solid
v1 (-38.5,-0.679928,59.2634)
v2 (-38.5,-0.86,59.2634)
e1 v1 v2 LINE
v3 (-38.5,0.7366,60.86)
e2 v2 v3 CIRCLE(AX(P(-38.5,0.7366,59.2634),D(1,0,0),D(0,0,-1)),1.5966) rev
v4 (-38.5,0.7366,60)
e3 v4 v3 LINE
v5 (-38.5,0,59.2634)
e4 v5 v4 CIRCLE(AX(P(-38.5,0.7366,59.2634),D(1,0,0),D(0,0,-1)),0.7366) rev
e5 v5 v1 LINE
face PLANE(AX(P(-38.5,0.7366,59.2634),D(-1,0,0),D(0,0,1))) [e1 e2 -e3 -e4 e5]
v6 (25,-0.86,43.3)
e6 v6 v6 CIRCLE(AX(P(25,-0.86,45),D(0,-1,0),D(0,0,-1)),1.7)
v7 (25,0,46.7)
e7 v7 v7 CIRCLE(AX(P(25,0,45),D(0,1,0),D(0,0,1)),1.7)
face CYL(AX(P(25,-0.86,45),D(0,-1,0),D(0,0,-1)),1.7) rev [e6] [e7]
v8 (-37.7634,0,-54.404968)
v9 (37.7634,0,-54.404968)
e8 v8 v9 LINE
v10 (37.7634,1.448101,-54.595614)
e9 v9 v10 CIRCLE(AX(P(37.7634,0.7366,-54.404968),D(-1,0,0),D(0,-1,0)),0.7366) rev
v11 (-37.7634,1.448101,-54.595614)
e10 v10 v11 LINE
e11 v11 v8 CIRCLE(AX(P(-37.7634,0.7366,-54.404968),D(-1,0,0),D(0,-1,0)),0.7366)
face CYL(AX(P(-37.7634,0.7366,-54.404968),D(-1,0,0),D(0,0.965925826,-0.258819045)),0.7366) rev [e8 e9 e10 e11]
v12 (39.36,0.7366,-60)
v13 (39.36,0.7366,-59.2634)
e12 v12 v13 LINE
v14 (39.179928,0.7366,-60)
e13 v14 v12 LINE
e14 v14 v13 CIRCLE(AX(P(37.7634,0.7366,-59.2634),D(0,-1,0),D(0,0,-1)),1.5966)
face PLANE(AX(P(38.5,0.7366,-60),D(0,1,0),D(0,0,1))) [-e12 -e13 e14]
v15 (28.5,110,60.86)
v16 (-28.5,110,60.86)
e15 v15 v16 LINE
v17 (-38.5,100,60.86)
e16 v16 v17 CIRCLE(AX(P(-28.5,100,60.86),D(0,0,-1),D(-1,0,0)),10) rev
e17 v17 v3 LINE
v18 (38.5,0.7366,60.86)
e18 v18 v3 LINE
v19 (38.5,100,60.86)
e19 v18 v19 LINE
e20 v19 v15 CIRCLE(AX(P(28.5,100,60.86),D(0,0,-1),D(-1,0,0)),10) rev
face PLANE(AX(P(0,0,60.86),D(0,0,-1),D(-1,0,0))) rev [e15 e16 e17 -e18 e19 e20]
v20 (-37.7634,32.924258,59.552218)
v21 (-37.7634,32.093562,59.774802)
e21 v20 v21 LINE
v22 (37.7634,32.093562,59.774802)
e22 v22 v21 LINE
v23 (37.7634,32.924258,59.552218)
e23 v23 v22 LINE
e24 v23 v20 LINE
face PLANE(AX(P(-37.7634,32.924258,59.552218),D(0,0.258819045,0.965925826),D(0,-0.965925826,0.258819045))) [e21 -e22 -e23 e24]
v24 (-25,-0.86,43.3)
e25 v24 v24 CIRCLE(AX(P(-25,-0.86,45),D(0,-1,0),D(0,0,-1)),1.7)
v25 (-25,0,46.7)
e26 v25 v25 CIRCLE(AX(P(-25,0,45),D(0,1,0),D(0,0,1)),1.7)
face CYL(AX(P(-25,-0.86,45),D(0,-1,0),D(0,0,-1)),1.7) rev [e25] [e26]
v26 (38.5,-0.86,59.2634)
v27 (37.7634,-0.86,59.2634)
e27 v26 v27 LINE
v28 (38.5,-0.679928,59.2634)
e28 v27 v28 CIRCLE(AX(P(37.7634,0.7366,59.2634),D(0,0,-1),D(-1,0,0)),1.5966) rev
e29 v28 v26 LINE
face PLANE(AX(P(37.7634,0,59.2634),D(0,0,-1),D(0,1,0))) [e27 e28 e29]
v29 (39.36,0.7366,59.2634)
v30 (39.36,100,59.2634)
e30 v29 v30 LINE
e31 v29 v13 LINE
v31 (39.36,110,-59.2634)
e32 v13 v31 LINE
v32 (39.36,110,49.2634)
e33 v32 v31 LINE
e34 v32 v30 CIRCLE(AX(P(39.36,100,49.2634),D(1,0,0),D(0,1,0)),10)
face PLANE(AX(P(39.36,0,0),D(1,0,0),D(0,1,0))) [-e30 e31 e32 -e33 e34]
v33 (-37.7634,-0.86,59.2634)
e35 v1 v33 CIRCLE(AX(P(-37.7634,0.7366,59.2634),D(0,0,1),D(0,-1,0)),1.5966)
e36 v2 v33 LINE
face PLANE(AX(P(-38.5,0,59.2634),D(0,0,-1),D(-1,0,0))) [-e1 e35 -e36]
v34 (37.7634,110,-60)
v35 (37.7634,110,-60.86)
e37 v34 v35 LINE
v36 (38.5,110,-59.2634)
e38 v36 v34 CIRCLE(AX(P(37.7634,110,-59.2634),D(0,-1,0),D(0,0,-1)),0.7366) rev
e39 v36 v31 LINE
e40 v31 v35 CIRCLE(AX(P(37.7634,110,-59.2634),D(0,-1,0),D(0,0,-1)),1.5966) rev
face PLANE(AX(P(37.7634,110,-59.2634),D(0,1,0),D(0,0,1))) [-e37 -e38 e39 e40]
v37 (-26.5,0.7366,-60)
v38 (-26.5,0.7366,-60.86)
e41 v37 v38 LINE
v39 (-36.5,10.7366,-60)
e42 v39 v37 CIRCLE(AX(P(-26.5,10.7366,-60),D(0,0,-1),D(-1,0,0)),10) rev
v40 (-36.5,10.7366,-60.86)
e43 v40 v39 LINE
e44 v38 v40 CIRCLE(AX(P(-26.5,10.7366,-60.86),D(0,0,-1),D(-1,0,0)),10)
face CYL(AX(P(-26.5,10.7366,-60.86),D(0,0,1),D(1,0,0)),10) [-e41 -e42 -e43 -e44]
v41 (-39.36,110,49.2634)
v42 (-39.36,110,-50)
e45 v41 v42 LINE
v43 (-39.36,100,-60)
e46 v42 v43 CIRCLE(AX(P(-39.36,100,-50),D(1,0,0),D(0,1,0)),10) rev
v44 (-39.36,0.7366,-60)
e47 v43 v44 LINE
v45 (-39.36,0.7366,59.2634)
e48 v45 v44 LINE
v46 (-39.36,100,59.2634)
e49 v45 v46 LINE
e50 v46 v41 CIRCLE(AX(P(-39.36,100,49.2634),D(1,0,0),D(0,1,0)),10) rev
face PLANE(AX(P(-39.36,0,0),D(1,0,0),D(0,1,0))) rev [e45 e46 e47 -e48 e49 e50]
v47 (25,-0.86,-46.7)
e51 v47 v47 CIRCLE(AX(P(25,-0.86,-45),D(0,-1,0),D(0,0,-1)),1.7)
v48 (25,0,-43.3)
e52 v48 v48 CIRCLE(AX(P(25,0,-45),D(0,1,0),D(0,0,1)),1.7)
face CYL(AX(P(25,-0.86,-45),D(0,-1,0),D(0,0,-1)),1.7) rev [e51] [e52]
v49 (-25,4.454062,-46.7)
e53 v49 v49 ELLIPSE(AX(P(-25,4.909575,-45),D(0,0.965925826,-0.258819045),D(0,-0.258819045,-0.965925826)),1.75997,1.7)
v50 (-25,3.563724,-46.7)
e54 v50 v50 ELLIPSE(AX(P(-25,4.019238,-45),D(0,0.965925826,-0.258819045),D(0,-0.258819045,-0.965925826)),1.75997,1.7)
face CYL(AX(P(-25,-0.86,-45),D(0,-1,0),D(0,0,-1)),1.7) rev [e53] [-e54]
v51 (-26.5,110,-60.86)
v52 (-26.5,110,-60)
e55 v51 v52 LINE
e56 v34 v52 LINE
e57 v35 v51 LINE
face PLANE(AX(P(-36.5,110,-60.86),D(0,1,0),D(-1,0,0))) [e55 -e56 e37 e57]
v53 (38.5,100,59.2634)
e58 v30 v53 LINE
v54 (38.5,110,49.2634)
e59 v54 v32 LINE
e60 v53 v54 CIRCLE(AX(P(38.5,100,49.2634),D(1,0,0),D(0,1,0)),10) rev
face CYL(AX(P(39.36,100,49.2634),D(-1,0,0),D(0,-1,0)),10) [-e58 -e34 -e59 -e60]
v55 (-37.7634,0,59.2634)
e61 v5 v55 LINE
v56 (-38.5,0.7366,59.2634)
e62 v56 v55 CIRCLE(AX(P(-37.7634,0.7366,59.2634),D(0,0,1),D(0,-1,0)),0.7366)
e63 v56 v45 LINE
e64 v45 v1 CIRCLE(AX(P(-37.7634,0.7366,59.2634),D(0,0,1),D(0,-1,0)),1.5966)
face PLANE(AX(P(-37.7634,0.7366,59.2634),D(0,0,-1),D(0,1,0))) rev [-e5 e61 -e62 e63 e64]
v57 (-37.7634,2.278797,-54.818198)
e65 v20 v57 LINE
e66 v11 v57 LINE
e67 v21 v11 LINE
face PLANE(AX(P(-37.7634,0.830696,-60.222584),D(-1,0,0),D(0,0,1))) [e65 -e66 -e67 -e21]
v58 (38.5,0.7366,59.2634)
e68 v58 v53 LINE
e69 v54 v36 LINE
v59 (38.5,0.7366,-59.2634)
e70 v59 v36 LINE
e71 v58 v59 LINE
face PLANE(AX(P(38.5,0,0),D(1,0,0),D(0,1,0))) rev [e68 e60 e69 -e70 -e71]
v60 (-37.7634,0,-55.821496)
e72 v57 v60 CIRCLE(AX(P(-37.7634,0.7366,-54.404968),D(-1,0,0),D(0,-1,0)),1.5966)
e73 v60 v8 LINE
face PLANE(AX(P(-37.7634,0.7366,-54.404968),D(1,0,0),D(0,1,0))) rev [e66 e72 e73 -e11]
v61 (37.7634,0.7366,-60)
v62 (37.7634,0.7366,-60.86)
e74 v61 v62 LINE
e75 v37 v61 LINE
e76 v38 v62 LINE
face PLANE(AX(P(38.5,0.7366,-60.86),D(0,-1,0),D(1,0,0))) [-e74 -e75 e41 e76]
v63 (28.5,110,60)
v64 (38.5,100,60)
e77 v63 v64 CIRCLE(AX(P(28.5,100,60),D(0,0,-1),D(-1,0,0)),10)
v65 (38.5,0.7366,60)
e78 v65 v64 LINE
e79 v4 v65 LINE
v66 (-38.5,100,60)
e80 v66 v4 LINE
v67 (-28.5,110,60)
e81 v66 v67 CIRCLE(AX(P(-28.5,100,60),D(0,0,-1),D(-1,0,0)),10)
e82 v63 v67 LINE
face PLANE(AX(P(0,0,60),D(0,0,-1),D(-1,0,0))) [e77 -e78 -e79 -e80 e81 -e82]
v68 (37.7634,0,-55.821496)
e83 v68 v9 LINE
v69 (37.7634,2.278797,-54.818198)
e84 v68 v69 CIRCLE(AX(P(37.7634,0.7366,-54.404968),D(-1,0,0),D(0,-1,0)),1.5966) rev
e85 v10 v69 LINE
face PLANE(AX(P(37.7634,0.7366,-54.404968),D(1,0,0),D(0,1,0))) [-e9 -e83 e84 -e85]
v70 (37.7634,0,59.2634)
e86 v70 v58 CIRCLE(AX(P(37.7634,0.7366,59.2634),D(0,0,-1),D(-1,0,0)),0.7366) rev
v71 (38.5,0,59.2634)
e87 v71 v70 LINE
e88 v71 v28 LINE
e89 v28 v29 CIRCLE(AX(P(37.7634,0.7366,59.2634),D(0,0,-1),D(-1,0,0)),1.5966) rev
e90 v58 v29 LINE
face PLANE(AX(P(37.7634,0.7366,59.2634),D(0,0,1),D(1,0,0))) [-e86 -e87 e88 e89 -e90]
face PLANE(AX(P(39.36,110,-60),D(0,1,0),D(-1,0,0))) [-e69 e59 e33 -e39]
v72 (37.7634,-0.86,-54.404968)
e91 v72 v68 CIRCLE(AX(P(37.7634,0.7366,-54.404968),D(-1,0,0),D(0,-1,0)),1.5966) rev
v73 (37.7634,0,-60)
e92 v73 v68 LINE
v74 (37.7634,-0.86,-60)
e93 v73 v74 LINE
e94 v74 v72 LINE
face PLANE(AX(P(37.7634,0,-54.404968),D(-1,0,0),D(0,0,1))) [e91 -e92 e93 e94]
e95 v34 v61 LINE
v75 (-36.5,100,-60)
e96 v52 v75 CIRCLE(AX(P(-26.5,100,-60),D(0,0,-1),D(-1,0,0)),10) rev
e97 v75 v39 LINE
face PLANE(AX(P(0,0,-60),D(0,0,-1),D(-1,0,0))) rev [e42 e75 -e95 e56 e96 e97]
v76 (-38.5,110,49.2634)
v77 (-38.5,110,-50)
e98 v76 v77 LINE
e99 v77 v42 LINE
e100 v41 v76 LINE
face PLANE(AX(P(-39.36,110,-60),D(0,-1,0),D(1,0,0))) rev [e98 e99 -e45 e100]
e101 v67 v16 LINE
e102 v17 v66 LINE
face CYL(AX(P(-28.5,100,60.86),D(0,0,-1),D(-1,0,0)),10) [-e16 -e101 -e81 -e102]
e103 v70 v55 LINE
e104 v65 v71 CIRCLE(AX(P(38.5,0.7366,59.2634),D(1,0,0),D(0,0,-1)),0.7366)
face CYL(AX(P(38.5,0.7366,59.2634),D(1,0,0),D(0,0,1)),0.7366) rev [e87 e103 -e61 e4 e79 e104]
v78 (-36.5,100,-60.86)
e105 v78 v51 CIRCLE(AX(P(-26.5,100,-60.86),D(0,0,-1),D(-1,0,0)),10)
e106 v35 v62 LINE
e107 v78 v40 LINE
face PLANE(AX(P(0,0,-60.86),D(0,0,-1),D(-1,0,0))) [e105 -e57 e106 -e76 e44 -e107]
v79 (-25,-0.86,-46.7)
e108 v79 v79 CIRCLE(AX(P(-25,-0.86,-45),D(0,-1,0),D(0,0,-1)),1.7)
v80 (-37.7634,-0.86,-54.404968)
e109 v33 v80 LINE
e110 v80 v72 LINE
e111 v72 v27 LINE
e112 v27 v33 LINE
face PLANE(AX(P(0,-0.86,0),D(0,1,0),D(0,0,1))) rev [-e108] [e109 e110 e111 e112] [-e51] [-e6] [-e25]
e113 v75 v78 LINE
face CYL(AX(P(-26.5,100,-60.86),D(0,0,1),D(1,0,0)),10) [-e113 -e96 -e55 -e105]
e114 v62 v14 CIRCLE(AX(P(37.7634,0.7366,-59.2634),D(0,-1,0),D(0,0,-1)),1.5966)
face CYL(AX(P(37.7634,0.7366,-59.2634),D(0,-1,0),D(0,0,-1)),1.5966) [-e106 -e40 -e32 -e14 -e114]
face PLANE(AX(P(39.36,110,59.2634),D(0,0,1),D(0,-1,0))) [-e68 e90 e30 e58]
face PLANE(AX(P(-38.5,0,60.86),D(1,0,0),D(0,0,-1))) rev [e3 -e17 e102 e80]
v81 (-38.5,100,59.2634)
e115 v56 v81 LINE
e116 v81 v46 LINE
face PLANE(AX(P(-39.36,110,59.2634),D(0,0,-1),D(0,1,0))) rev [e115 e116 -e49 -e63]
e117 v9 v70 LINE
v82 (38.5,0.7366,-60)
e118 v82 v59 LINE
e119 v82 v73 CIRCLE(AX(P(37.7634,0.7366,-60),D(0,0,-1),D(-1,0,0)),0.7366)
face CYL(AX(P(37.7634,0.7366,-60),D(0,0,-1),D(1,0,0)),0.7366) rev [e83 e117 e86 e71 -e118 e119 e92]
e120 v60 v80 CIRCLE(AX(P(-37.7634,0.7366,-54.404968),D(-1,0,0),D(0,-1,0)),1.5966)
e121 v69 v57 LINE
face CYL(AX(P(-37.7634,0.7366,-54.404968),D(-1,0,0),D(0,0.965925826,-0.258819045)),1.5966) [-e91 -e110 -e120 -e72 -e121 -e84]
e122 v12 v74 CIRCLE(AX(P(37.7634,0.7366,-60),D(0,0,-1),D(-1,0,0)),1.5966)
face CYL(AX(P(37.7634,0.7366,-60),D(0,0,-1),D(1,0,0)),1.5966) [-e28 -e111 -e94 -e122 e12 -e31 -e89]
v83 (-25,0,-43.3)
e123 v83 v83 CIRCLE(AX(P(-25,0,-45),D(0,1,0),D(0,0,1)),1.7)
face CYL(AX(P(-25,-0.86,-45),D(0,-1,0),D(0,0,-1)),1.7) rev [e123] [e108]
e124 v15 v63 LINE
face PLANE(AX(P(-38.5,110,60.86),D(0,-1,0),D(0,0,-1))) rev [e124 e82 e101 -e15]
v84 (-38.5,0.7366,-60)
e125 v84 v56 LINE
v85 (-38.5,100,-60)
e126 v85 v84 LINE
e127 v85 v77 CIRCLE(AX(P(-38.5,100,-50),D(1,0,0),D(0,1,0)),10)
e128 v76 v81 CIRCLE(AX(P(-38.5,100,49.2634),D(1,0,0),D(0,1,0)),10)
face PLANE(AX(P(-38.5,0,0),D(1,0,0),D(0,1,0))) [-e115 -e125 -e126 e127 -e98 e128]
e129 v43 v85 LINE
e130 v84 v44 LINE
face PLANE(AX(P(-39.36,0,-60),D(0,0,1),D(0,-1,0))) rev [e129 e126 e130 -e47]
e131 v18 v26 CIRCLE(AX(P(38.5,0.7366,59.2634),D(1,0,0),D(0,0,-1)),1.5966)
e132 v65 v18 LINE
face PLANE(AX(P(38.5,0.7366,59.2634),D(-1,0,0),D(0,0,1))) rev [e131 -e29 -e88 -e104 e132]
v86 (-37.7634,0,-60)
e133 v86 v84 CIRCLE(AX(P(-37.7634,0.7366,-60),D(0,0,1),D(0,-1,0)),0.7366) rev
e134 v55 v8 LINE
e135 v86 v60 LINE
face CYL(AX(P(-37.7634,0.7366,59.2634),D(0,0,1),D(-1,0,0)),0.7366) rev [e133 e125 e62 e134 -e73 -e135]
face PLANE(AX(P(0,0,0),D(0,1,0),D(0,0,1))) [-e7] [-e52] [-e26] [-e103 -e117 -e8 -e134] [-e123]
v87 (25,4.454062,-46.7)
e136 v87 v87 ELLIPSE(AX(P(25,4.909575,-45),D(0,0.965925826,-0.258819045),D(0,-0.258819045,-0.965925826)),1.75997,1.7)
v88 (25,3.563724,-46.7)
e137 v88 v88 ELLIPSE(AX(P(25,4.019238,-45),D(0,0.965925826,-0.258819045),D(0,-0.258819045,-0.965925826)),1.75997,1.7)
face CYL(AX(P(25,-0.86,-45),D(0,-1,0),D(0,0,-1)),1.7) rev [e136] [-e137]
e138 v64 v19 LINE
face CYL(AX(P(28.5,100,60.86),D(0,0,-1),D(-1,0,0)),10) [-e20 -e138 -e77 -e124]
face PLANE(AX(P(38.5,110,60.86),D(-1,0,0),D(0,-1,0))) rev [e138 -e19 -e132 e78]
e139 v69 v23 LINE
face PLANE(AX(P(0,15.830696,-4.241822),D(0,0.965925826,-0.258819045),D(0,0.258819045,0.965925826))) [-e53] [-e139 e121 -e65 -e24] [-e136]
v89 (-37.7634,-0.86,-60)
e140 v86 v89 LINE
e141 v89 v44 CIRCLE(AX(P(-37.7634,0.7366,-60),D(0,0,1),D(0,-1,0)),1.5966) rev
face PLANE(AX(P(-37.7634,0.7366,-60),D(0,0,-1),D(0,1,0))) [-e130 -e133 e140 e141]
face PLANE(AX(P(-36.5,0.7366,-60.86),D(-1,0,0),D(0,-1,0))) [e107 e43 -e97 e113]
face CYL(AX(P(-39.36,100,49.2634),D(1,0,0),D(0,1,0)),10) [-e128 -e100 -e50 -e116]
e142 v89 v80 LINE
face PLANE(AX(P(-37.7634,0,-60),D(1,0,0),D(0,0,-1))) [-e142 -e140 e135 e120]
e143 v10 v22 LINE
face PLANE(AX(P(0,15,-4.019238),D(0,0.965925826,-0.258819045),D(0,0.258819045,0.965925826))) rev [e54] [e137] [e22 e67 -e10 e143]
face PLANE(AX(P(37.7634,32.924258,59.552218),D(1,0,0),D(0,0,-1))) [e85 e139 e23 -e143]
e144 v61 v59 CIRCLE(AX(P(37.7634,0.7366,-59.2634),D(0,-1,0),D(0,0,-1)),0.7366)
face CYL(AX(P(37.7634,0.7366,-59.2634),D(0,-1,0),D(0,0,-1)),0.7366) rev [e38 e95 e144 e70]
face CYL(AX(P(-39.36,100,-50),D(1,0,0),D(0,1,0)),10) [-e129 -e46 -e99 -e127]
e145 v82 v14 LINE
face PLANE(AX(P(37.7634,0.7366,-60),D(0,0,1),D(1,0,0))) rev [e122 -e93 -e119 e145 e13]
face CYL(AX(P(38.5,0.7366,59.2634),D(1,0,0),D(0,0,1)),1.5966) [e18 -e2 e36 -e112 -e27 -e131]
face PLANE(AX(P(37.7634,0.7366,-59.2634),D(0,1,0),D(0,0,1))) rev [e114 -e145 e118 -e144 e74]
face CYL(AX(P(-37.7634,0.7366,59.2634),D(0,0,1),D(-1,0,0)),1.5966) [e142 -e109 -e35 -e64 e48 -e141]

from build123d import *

# Parameters (mm, degrees)
SKETCH1_W                    = 77
SKETCH1_H                    = 120
BASE_FLANGE1_DEPTH           = 0.86
EDGE_FLANGE1_STRIP_W         = 4.9132
EDGE_FLANGE1_STRIP_H         = 0.86
EDGE_FLANGE1_STRIP_CUT_DEPTH = 77
EDGE_FLANGE1_DEPTH           = 77
EDGE_FLANGE2_STRIP_W         = 4.9132
EDGE_FLANGE2_STRIP_H         = 0.86
EDGE_FLANGE2_STRIP_CUT_DEPTH = 119.2634
EDGE_FLANGE2_DEPTH           = 119.2634
EDGE_FLANGE3_STRIP_W         = 4.9132
EDGE_FLANGE3_STRIP_H         = 0.86
EDGE_FLANGE3_STRIP_CUT_DEPTH = 119.2634
EDGE_FLANGE3_DEPTH           = 119.2634
EDGE_FLANGE4_STRIP_CUT_DEPTH = 75.5268
EDGE_FLANGE4_DEPTH           = 75.5268
EDGE_FLANGE8_STRIP_W         = 4.9132
EDGE_FLANGE8_STRIP_H         = 0.86
EDGE_FLANGE8_STRIP_CUT_DEPTH = 109.2634
EDGE_FLANGE8_DEPTH           = 109.2634
M3_CLEARANCE_HOLE3_D         = 3.4
M3_CLEARANCE_HOLE3_DEPTH     = 25.4
M3_CLEARANCE_HOLE3_TIP       = 1.021463052
FILLET1_R                    = 10


# Sheet-metal steps are written as plain solids
with BuildPart() as part:
    # Sketch1 → Base-Flange1 (new body)
    with BuildSketch(Plane(origin=(0, 0, 0), x_dir=(1, 0, 0), z_dir=(0, 1, 0))):
        Rectangle(SKETCH1_W, SKETCH1_H)
    extrude(amount=-BASE_FLANGE1_DEPTH)

    # Edge-Flange1 strip (across the edge) → Edge-Flange1 strip cut (cut)
    with BuildSketch(Plane(origin=(-38.5, 0, 60), x_dir=(0, 0, -1), z_dir=(1, 0, 0))):
        with Locations((-1.72, -0.43)):
            Rectangle(EDGE_FLANGE1_STRIP_W, EDGE_FLANGE1_STRIP_H)
    extrude(amount=EDGE_FLANGE1_STRIP_CUT_DEPTH, mode=Mode.SUBTRACT)

    # Edge-Flange1 section (across the edge) → Edge-Flange1 (add)
    with BuildSketch(Plane(origin=(-38.5, 0, 60), x_dir=(0, 0, -1), z_dir=(1, 0, 0))):
        with BuildLine():
            Line((-0.86, 0.7366), (-0.86, 110))
            Line((-0.86, 110), (0, 110))
            Line((0, 110), (0, 0.7366))
            ThreePointArc((0, 0.7366), (0.215745145, 0.215745145), (0.7366, 0))
            Line((0.7366, 0), (0.7366, -0.86))
            ThreePointArc((0.7366, -0.86), (-0.392366687, -0.392366687), (-0.86, 0.7366))
        make_face()
    extrude(amount=EDGE_FLANGE1_DEPTH)

    # Edge-Flange2 strip (across the edge) → Edge-Flange2 strip cut (cut)
    with BuildSketch(Plane(origin=(38.5, 0, 59.2634), x_dir=(-1, 0, 0), z_dir=(0, 0, -1))):
        with Locations((-1.72, -0.43)):
            Rectangle(EDGE_FLANGE2_STRIP_W, EDGE_FLANGE2_STRIP_H)
    extrude(amount=EDGE_FLANGE2_STRIP_CUT_DEPTH, mode=Mode.SUBTRACT)

    # Edge-Flange2 section (across the edge) → Edge-Flange2 (add)
    with BuildSketch(Plane(origin=(38.5, 0, 59.2634), x_dir=(-1, 0, 0), z_dir=(0, 0, -1))):
        with BuildLine():
            Line((-0.86, 0.7366), (-0.86, 110))
            Line((-0.86, 110), (0, 110))
            Line((0, 110), (0, 0.7366))
            ThreePointArc((0, 0.7366), (0.215745145, 0.215745145), (0.7366, 0))
            Line((0.7366, 0), (0.7366, -0.86))
            ThreePointArc((0.7366, -0.86), (-0.392366687, -0.392366687), (-0.86, 0.7366))
        make_face()
    extrude(amount=EDGE_FLANGE2_DEPTH)

    # Edge-Flange3 strip (across the edge) → Edge-Flange3 strip cut (cut)
    with BuildSketch(Plane(origin=(-38.5, 0, -60), x_dir=(1, 0, 0), z_dir=(0, 0, 1))):
        with Locations((-1.72, -0.43)):
            Rectangle(EDGE_FLANGE3_STRIP_W, EDGE_FLANGE3_STRIP_H)
    extrude(amount=EDGE_FLANGE3_STRIP_CUT_DEPTH, mode=Mode.SUBTRACT)

    # Edge-Flange3 section (across the edge) → Edge-Flange3 (add)
    with BuildSketch(Plane(origin=(-38.5, 0, -60), x_dir=(1, 0, 0), z_dir=(0, 0, 1))):
        with BuildLine():
            Line((-0.86, 0.7366), (-0.86, 110))
            Line((-0.86, 110), (0, 110))
            Line((0, 110), (0, 0.7366))
            ThreePointArc((0, 0.7366), (0.215745145, 0.215745145), (0.7366, 0))
            Line((0.7366, 0), (0.7366, -0.86))
            ThreePointArc((0.7366, -0.86), (-0.392366687, -0.392366687), (-0.86, 0.7366))
        make_face()
    extrude(amount=EDGE_FLANGE3_DEPTH)

    # Edge-Flange4 strip (across the edge) → Edge-Flange4 strip cut (cut)
    with BuildSketch(Plane(origin=(37.7634, 0, -60), x_dir=(0, -0.9659258262890681, 0.25881904510252135), z_dir=(-1, 0, 0))):
        Polygon((-7.380189595, -30.866027382), (2.278797174, 5.181801992), (1.448100964, 5.404386371), (-8.210885806, -30.643443003), align=None)
    extrude(amount=EDGE_FLANGE4_STRIP_CUT_DEPTH, mode=Mode.SUBTRACT)

    # Edge-Flange4 section (across the edge) → Edge-Flange4 (add)
    with BuildSketch(Plane(origin=(37.7634, 0, -60), x_dir=(0, -0.9659258262890681, 0.25881904510252135), z_dir=(-1, 0, 0))):
        with BuildLine():
            Line((-0.86, 5.595032479), (-0.86, 124))
            Line((-0.86, 124), (0, 124))
            Line((0, 124), (0, 5.595032479))
            ThreePointArc((0, 5.595032479), (0.640454407, 4.864734195), (1.448100964, 5.404386371))
            Line((1.448100964, 5.404386371), (2.278797174, 5.181801992))
            ThreePointArc((2.278797174, 5.181801992), (0.528201882, 4.012091614), (-0.86, 5.595032479))
        make_face()
    extrude(amount=EDGE_FLANGE4_DEPTH)

    # Edge-Flange8 strip (across the edge) → Edge-Flange8 strip cut (cut)
    with BuildSketch(Plane(origin=(38.5, 110, -60), x_dir=(0, 0, 1), z_dir=(0, -1, 0))):
        with Locations((-1.72, -0.43)):
            Rectangle(EDGE_FLANGE8_STRIP_W, EDGE_FLANGE8_STRIP_H)
    extrude(amount=EDGE_FLANGE8_STRIP_CUT_DEPTH, mode=Mode.SUBTRACT)

    # Edge-Flange8 section (across the edge) → Edge-Flange8 (add)
    with BuildSketch(Plane(origin=(38.5, 110, -60), x_dir=(0, 0, 1), z_dir=(0, -1, 0))):
        with BuildLine():
            Line((-0.86, 0.7366), (-0.86, 75))
            Line((-0.86, 75), (0, 75))
            Line((0, 75), (0, 0.7366))
            ThreePointArc((0, 0.7366), (0.215745145, 0.215745145), (0.7366, 0))
            Line((0.7366, 0), (0.7366, -0.86))
            ThreePointArc((0.7366, -0.86), (-0.392366687, -0.392366687), (-0.86, 0.7366))
        make_face()
    extrude(amount=EDGE_FLANGE8_DEPTH)

    # M3 Clearance Hole3
    with Locations(Plane(origin=(0, -0.86, 0), x_dir=(-1, 0, 0), z_dir=(0, -1, 0))):
        with Locations((-25, 45), (25, 45), (25, -45), (-25, -45)):
            Hole(M3_CLEARANCE_HOLE3_D / 2, depth=M3_CLEARANCE_HOLE3_DEPTH)
            with Locations((0, 0, -(M3_CLEARANCE_HOLE3_DEPTH + M3_CLEARANCE_HOLE3_TIP / 2))):  # 118° drill point
                Cone(0, M3_CLEARANCE_HOLE3_D / 2, M3_CLEARANCE_HOLE3_TIP, mode=Mode.SUBTRACT)

    # Fillet1
    fillet1_edges = [part.edges().sort_by_distance(p)[0] for p in [
        (-36.5, 0.7366, -60.43),
        (-36.5, 110, -60.43),
        (-38.93, 110, -60),
        (-38.93, 110, 59.2634),
        (38.93, 110, 59.2634),
        (38.5, 110, 60.43),
        (-38.5, 110, 60.43),
    ]]
    fillet(fillet1_edges, radius=FILLET1_R)


solid = part.part
